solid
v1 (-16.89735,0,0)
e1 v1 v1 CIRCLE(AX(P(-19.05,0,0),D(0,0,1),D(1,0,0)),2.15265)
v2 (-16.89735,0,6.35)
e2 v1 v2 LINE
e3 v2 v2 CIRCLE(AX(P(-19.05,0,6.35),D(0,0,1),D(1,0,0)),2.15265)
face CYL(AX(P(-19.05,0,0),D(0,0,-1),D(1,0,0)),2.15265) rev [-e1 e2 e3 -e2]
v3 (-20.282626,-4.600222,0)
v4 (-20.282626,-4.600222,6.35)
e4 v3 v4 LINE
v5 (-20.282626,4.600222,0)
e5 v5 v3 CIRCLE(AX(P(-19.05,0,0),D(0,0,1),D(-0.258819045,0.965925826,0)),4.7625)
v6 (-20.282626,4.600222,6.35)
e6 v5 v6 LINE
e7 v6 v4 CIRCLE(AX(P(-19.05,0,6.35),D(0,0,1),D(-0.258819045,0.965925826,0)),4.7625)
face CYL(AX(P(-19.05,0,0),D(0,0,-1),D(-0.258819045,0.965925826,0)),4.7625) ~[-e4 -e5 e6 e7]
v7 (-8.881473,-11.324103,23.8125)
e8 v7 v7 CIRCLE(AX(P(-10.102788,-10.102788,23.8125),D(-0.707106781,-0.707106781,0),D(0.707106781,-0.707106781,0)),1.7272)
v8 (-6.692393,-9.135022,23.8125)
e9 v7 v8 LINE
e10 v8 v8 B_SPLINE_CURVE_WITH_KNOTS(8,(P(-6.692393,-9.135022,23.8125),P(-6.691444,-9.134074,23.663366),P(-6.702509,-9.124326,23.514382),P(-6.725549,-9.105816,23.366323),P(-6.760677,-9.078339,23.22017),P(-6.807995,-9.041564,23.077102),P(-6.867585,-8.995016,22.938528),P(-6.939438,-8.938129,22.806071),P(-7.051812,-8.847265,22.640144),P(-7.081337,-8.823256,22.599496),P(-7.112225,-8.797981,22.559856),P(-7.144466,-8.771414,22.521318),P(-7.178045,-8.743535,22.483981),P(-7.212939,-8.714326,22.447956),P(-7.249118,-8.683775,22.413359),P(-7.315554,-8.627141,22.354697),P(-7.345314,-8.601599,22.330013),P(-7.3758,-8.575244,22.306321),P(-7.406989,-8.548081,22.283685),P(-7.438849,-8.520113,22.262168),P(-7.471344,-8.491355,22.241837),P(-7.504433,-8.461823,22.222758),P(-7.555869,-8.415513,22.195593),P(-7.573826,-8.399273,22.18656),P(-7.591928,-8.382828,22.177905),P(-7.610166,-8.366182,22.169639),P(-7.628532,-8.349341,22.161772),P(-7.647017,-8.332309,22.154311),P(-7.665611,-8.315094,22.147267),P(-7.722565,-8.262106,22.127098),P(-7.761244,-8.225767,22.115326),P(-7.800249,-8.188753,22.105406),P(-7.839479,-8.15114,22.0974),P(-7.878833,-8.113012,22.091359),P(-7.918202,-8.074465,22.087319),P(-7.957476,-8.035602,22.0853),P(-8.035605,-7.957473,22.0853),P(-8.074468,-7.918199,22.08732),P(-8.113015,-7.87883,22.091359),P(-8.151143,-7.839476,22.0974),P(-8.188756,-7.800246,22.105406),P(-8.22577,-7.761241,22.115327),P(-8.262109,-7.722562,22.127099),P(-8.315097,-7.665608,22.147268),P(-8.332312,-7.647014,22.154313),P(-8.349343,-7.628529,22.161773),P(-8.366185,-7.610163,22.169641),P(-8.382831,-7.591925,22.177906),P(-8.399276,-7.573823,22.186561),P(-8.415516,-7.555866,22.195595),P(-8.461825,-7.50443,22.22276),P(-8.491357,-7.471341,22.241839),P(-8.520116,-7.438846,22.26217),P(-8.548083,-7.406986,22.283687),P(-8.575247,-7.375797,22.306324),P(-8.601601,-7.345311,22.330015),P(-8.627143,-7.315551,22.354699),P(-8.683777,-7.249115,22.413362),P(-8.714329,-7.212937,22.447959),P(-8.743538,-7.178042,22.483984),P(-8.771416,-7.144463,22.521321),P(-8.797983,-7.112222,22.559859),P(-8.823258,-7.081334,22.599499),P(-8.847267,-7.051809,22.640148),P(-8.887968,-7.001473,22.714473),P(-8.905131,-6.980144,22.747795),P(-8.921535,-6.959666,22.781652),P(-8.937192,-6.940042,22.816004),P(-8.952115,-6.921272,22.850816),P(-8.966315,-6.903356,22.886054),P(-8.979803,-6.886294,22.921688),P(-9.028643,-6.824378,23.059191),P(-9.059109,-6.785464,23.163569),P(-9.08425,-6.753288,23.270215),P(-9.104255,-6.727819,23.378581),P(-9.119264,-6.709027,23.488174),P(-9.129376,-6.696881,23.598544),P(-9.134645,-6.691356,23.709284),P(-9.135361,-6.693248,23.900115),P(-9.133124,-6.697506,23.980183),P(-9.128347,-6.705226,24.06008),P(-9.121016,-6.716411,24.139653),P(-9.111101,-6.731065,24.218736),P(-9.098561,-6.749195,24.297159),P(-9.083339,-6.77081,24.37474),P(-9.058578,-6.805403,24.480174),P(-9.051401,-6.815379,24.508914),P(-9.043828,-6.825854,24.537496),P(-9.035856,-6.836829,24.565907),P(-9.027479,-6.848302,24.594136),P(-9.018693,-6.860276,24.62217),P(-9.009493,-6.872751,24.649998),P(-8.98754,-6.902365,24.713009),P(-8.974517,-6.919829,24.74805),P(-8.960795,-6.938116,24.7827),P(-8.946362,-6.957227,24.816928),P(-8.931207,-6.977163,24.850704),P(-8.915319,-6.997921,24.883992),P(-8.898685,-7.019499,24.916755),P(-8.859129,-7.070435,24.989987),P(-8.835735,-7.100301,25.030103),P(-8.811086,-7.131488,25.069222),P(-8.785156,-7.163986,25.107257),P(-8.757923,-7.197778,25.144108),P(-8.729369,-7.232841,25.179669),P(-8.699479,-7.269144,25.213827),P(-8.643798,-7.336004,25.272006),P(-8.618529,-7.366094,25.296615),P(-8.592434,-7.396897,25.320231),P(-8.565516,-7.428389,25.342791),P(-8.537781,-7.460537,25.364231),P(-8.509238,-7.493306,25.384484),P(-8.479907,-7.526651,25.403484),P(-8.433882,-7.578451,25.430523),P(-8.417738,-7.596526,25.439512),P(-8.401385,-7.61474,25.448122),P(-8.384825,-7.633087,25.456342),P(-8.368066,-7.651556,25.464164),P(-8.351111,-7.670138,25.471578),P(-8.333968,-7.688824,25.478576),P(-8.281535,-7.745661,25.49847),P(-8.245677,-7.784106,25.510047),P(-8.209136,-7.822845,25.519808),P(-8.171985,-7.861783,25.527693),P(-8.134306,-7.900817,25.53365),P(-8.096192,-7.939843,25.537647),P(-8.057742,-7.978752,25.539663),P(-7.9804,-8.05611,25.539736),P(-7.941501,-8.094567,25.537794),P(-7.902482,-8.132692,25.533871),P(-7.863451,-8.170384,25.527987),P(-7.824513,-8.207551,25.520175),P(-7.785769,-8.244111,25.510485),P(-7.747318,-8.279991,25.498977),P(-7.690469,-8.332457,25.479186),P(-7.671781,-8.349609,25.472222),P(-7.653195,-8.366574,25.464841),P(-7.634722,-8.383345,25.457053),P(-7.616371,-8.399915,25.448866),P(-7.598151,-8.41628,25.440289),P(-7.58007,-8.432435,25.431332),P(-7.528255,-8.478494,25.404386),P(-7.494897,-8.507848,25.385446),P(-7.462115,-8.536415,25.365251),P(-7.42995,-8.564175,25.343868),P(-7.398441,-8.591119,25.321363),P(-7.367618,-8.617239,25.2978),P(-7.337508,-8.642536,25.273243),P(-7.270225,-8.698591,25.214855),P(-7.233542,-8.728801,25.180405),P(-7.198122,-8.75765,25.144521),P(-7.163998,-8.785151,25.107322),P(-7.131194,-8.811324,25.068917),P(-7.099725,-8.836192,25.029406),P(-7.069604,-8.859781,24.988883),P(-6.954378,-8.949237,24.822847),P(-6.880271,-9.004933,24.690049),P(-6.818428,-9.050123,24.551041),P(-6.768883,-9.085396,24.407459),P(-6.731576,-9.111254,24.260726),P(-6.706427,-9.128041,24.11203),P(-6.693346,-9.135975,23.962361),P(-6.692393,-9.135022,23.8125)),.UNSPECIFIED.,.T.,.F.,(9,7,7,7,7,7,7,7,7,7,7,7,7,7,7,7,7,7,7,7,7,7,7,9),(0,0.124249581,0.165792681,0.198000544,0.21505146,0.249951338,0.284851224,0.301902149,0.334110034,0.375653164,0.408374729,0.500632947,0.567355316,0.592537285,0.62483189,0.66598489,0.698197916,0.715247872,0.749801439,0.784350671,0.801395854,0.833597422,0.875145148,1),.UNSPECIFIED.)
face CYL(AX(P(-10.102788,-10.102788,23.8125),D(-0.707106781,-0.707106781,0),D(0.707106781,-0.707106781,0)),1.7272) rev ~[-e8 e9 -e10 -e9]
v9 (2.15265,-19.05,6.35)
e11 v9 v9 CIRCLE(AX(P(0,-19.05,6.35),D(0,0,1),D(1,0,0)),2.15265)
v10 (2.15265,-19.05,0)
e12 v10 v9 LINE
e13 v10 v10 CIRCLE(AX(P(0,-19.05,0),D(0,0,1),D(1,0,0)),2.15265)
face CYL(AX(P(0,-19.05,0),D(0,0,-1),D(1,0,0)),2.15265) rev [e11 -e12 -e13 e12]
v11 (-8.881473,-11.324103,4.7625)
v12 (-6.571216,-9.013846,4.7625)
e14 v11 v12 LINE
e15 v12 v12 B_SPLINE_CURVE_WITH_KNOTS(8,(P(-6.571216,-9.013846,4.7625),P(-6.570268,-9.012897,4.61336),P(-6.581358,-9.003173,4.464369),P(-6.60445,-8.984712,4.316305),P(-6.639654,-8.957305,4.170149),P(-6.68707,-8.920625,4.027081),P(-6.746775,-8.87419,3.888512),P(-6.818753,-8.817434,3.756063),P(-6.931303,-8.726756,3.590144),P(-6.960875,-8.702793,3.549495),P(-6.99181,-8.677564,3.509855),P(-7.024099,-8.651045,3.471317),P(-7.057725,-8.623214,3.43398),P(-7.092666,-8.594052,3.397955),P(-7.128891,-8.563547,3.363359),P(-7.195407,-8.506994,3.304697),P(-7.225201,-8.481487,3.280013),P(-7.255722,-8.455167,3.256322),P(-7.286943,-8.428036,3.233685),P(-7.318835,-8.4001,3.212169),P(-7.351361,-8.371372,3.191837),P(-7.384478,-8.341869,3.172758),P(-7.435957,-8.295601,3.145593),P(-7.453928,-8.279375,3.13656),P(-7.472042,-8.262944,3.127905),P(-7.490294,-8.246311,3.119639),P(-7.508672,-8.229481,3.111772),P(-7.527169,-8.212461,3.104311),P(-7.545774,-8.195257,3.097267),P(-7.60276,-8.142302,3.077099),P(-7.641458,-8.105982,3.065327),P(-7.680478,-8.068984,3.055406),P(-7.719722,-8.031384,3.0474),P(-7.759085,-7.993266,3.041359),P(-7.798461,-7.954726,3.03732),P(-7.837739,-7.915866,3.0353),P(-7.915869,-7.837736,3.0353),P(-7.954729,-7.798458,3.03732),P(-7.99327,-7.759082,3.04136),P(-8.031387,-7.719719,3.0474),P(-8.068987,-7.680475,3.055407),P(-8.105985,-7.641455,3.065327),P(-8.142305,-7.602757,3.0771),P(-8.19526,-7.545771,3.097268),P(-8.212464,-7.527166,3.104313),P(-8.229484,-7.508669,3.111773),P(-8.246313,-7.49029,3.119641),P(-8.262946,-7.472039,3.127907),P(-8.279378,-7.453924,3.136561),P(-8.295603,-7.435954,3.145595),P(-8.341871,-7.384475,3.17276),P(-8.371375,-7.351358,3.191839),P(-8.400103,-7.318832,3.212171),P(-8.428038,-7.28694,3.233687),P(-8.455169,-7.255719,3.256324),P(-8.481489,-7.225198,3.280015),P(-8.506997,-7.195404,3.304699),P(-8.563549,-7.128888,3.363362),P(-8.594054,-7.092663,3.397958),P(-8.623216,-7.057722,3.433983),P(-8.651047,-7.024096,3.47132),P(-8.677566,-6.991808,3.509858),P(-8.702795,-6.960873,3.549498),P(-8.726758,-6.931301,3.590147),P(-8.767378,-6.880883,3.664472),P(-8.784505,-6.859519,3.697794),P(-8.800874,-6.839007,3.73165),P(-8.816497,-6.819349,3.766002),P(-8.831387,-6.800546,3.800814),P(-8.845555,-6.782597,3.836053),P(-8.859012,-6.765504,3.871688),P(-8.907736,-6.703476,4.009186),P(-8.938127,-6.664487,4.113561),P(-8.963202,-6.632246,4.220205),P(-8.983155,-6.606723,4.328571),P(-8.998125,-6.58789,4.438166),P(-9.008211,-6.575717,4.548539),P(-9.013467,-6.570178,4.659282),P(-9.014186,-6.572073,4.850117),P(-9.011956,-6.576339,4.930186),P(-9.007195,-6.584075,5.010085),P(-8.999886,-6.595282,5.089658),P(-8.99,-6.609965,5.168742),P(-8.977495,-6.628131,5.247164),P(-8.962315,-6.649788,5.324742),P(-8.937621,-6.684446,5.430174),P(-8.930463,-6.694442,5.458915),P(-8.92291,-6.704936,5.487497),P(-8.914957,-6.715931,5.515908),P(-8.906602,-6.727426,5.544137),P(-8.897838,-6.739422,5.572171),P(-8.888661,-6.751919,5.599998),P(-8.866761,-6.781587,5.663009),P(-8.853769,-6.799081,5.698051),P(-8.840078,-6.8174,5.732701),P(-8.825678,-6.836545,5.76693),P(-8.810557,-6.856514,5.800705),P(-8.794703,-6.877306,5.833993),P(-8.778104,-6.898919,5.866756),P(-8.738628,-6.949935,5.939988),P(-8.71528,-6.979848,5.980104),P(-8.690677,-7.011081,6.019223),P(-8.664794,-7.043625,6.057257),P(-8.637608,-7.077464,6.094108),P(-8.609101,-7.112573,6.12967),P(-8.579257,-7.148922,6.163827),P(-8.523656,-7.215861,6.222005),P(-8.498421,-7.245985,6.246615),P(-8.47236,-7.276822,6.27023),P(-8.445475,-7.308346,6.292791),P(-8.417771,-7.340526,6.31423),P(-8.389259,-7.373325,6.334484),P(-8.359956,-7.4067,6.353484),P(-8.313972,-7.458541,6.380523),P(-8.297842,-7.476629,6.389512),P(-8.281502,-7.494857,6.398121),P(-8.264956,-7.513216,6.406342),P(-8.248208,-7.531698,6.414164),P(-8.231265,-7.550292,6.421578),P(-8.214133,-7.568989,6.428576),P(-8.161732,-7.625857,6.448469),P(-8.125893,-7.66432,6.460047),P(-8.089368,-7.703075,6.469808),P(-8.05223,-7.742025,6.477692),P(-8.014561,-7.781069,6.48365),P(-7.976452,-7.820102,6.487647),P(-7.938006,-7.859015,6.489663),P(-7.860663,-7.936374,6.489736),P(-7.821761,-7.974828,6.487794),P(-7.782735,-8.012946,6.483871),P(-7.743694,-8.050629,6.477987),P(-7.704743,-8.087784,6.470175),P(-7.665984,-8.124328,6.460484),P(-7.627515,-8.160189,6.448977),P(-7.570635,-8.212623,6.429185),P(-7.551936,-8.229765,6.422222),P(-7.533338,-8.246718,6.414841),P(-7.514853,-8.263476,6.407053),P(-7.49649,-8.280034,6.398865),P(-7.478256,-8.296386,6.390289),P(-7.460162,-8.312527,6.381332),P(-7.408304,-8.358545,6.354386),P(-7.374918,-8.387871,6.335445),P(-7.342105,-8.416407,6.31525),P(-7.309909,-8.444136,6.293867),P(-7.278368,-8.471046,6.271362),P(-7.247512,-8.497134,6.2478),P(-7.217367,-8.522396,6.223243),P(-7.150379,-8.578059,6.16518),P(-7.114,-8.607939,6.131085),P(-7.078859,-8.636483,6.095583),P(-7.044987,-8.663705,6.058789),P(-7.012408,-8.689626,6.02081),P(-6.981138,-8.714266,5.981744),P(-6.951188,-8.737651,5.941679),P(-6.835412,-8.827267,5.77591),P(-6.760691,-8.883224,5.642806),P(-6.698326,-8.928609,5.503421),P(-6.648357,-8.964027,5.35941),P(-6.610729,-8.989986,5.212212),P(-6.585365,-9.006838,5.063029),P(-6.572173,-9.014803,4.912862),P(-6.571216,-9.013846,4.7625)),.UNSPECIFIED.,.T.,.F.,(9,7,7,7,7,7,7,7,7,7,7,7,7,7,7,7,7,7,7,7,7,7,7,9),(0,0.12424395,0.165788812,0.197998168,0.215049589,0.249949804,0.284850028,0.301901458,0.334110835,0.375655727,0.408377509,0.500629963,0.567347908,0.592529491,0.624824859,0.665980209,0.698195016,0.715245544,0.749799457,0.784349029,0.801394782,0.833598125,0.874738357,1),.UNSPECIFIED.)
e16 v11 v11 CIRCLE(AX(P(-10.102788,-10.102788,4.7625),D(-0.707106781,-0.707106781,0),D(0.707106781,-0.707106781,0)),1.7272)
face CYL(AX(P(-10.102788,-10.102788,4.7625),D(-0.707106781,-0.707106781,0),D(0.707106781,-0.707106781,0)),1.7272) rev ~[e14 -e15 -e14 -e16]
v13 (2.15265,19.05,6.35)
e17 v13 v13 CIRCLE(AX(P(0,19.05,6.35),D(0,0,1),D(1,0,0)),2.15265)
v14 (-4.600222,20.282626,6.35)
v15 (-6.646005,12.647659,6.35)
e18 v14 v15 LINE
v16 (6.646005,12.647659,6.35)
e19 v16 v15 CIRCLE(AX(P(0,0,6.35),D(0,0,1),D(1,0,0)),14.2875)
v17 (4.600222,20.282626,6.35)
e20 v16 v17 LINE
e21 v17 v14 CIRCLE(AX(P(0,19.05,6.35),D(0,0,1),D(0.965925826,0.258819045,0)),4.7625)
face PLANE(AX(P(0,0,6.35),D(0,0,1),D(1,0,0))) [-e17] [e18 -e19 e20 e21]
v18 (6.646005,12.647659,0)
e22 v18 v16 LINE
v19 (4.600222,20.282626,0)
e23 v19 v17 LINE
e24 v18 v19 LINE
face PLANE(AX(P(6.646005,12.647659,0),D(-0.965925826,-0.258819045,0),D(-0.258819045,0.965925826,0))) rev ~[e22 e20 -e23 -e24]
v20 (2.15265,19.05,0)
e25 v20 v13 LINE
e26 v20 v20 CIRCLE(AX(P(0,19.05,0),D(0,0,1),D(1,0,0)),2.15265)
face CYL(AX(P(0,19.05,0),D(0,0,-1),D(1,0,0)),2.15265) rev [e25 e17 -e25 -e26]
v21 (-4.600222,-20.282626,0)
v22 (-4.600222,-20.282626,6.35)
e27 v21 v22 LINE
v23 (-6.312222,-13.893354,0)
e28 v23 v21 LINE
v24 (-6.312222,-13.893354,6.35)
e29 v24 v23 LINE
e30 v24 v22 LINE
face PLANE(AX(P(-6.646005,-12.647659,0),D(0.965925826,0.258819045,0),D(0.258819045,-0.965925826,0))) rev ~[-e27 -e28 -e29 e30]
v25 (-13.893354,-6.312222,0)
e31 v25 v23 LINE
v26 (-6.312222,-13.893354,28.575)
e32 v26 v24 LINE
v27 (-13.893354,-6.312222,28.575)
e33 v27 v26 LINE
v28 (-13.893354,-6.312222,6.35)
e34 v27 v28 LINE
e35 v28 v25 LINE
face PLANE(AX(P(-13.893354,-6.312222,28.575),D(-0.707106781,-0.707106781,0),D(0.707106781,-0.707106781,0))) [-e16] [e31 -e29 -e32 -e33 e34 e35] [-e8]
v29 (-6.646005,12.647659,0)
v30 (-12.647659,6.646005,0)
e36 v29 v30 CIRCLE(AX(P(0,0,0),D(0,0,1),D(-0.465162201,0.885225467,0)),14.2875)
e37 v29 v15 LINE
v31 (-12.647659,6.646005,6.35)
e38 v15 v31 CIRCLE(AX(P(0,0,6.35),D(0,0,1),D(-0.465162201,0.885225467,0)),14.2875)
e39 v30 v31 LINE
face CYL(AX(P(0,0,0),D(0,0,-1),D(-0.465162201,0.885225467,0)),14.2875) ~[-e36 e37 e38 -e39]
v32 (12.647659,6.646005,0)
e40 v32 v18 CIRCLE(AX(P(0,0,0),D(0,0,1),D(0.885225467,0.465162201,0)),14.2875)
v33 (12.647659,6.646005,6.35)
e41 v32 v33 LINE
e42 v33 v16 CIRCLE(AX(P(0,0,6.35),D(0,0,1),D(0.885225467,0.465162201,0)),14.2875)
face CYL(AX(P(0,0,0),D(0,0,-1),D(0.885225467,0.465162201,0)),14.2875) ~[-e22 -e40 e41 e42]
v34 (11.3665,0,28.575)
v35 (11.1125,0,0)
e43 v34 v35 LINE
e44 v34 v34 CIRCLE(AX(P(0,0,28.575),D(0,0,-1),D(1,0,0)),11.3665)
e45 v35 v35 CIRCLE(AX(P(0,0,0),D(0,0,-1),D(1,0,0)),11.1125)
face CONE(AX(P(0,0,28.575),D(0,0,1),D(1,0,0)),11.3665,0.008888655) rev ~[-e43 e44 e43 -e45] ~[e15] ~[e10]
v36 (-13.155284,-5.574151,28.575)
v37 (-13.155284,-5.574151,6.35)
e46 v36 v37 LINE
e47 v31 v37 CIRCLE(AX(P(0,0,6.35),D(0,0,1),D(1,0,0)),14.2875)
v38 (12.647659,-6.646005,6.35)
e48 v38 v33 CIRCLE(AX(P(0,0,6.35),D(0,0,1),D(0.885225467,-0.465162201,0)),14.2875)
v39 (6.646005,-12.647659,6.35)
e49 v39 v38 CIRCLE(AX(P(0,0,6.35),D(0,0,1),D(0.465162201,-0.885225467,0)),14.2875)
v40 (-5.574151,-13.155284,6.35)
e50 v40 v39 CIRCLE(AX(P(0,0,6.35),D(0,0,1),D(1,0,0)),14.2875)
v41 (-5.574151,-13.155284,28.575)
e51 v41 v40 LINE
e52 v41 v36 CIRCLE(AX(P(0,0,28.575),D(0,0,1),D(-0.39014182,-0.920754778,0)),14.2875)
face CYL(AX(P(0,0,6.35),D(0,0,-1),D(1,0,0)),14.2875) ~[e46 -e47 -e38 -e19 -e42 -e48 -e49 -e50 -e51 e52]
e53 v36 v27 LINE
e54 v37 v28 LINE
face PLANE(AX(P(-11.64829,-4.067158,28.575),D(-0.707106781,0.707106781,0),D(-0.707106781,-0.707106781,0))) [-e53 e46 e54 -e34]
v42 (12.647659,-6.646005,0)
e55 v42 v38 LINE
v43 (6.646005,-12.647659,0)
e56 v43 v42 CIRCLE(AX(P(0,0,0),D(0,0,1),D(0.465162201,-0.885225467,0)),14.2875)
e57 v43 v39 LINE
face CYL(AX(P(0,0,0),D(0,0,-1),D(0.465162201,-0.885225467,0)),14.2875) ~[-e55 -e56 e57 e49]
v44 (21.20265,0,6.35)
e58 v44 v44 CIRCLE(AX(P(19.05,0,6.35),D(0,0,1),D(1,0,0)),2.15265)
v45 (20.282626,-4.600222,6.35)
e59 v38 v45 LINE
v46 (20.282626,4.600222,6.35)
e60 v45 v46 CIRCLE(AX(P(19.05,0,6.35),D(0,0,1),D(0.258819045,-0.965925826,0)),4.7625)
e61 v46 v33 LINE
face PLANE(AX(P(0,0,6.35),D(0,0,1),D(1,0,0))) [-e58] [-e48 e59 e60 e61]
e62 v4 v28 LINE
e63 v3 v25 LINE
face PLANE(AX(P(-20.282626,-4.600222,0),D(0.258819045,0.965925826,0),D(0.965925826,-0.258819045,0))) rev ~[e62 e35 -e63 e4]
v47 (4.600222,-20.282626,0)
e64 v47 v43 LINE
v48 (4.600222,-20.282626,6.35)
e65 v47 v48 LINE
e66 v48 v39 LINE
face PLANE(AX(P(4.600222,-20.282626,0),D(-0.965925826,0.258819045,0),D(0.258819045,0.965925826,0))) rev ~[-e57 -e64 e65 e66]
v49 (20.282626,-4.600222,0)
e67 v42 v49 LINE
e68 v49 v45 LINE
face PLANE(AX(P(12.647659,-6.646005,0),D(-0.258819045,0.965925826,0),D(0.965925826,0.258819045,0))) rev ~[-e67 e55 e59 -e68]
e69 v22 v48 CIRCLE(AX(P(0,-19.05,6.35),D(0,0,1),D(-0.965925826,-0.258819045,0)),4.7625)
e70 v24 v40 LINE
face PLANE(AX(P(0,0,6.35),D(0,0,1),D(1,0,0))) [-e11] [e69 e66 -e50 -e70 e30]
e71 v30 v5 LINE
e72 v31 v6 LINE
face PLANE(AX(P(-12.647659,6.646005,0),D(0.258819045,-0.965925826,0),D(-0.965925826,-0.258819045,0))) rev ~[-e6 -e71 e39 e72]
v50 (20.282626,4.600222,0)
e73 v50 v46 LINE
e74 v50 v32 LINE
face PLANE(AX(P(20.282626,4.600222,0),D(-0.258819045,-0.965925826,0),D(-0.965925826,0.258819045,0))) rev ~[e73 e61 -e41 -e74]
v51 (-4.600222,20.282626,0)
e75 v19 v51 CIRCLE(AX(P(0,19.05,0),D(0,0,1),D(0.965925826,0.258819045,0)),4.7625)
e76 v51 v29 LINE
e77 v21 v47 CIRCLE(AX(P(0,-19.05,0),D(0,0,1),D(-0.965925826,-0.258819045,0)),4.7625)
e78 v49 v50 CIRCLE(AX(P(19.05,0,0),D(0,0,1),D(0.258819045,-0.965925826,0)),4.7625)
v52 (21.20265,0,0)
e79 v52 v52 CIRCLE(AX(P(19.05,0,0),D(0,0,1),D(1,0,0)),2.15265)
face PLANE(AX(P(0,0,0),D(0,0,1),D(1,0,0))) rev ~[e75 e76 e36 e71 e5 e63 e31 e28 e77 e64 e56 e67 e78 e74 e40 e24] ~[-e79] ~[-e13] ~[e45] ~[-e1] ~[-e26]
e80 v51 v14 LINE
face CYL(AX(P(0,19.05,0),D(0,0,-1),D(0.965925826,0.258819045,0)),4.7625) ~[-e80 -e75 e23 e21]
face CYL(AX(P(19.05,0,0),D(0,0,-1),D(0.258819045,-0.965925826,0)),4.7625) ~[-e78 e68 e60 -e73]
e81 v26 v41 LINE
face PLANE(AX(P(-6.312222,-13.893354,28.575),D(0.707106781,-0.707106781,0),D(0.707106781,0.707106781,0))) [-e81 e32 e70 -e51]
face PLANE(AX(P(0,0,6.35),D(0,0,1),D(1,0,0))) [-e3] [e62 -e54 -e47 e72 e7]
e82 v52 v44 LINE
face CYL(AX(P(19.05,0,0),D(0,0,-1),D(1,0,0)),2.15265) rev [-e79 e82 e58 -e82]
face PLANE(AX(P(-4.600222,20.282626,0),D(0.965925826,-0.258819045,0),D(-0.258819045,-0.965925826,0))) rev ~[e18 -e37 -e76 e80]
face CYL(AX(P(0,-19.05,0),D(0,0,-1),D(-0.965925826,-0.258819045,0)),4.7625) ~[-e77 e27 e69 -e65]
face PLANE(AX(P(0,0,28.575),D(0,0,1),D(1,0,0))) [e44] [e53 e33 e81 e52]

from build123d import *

# Parameters (mm, degrees)
F0_R     = 2.15265
F0_R_2   = 11.1125
F1_DEPTH = 6.35
F2_R     = 14.2875
F2_R_2   = 11.1125
F3_DEPTH = 22.225
F5_DEPTH = 28.575
F6_R     = 1.7272
F7_DEPTH = 4.3100488316


# Not quite as in the source:
# - a fillet or chamfer that OpenCascade refuses, or shapes differently, is made with other operations: its cross-section is extruded or revolved along the edge and cut away or added


with BuildPart() as f1:
    # F0 (on Top) → F1 (new body)
    with BuildSketch(Plane.XY):
        with BuildLine():
            Line((6.6460049492, 12.6476588531), (4.6002217477, 20.2826257023))
            ThreePointArc((4.6002217477, 20.2826257023), (0, 23.8125), (-4.6002217477, 20.2826257023))
            Line((-4.6002217477, 20.2826257023), (-6.6460049492, 12.6476588531))
            ThreePointArc((-6.6460049492, 12.6476588531), (-10.1027881362, 10.1027881362), (-12.6476588531, 6.6460049492))
            Line((-12.6476588531, 6.6460049492), (-20.2826257023, 4.6002217477))
            ThreePointArc((-20.2826257023, 4.6002217477), (-23.8125, 0), (-20.2826257023, -4.6002217477))
            Line((-20.2826257023, -4.6002217477), (-12.6476588531, -6.6460049492))
            ThreePointArc((-12.6476588531, -6.6460049492), (-10.1027881362, -10.1027881362), (-6.6460049492, -12.6476588531))
            Line((-6.6460049492, -12.6476588531), (-4.6002217477, -20.2826257023))
            ThreePointArc((-4.6002217477, -20.2826257023), (0, -23.8125), (4.6002217477, -20.2826257023))
            Line((4.6002217477, -20.2826257023), (6.6460049492, -12.6476588531))
            ThreePointArc((6.6460049492, -12.6476588531), (10.1027881362, -10.1027881362), (12.6476588531, -6.6460049492))
            Line((12.6476588531, -6.6460049492), (20.2826257023, -4.6002217477))
            ThreePointArc((20.2826257023, -4.6002217477), (23.8125, 0), (20.2826257023, 4.6002217477))
            Line((20.2826257023, 4.6002217477), (12.6476588531, 6.6460049492))
            ThreePointArc((12.6476588531, 6.6460049492), (10.1027881362, 10.1027881362), (6.6460049492, 12.6476588531))
        make_face()
        with Locations((0, -19.05)):
            Circle(F0_R, mode=Mode.SUBTRACT)
        with Locations((-19.05, 0)):
            Circle(F0_R, mode=Mode.SUBTRACT)
        Circle(F0_R_2, mode=Mode.SUBTRACT)
        with Locations((19.05, 0)):
            Circle(F0_R, mode=Mode.SUBTRACT)
        with Locations((0, 19.05)):
            Circle(F0_R, mode=Mode.SUBTRACT)
    extrude(amount=F1_DEPTH)

    # F2 (on face) → F3 (join)
    with BuildSketch(Plane.XY.offset(6.35)):
        Circle(F2_R)
        Circle(F2_R_2, mode=Mode.SUBTRACT)
    extrude(amount=F3_DEPTH)

    # F4 (on face) → F5 (join, through all)
    with BuildSketch(Plane.XY.offset(28.575)):
        Polygon((-4.0671577888, -11.648290423), (-11.648290423, -4.0671577888), (-13.8933544533, -6.3122218191), (-6.3122218191, -13.8933544533), align=None)
    extrude(amount=-F5_DEPTH)

    # F6 (on face) → F7 (cut, up to face)
    with BuildSketch(Plane(origin=(-10.1027881362, -10.1027881362, 0), x_dir=(0.7071067812, -0.7071067812, 0), z_dir=(-0.7071067812, -0.7071067812, 0))):
        with Locations((0, 23.8125)):
            Circle(F6_R)
        with Locations((0, 4.7625)):
            Circle(F6_R)
    extrude(amount=-F7_DEPTH, mode=Mode.SUBTRACT)

    # F8: chamfer of 28.575 x 0.254 on 1 edges, made by hand

    # F8_s1 → F8_t2 (revolve, cut)
    with BuildSketch(Plane.XZ):
        Polygon((11.3665, 28.575), (11.1125, 0), (11.1125, 28.575), align=None)
    revolve(axis=Axis((0, 0, 28.575), (0, 0, -1)), mode=Mode.SUBTRACT)


solid = f1.part
